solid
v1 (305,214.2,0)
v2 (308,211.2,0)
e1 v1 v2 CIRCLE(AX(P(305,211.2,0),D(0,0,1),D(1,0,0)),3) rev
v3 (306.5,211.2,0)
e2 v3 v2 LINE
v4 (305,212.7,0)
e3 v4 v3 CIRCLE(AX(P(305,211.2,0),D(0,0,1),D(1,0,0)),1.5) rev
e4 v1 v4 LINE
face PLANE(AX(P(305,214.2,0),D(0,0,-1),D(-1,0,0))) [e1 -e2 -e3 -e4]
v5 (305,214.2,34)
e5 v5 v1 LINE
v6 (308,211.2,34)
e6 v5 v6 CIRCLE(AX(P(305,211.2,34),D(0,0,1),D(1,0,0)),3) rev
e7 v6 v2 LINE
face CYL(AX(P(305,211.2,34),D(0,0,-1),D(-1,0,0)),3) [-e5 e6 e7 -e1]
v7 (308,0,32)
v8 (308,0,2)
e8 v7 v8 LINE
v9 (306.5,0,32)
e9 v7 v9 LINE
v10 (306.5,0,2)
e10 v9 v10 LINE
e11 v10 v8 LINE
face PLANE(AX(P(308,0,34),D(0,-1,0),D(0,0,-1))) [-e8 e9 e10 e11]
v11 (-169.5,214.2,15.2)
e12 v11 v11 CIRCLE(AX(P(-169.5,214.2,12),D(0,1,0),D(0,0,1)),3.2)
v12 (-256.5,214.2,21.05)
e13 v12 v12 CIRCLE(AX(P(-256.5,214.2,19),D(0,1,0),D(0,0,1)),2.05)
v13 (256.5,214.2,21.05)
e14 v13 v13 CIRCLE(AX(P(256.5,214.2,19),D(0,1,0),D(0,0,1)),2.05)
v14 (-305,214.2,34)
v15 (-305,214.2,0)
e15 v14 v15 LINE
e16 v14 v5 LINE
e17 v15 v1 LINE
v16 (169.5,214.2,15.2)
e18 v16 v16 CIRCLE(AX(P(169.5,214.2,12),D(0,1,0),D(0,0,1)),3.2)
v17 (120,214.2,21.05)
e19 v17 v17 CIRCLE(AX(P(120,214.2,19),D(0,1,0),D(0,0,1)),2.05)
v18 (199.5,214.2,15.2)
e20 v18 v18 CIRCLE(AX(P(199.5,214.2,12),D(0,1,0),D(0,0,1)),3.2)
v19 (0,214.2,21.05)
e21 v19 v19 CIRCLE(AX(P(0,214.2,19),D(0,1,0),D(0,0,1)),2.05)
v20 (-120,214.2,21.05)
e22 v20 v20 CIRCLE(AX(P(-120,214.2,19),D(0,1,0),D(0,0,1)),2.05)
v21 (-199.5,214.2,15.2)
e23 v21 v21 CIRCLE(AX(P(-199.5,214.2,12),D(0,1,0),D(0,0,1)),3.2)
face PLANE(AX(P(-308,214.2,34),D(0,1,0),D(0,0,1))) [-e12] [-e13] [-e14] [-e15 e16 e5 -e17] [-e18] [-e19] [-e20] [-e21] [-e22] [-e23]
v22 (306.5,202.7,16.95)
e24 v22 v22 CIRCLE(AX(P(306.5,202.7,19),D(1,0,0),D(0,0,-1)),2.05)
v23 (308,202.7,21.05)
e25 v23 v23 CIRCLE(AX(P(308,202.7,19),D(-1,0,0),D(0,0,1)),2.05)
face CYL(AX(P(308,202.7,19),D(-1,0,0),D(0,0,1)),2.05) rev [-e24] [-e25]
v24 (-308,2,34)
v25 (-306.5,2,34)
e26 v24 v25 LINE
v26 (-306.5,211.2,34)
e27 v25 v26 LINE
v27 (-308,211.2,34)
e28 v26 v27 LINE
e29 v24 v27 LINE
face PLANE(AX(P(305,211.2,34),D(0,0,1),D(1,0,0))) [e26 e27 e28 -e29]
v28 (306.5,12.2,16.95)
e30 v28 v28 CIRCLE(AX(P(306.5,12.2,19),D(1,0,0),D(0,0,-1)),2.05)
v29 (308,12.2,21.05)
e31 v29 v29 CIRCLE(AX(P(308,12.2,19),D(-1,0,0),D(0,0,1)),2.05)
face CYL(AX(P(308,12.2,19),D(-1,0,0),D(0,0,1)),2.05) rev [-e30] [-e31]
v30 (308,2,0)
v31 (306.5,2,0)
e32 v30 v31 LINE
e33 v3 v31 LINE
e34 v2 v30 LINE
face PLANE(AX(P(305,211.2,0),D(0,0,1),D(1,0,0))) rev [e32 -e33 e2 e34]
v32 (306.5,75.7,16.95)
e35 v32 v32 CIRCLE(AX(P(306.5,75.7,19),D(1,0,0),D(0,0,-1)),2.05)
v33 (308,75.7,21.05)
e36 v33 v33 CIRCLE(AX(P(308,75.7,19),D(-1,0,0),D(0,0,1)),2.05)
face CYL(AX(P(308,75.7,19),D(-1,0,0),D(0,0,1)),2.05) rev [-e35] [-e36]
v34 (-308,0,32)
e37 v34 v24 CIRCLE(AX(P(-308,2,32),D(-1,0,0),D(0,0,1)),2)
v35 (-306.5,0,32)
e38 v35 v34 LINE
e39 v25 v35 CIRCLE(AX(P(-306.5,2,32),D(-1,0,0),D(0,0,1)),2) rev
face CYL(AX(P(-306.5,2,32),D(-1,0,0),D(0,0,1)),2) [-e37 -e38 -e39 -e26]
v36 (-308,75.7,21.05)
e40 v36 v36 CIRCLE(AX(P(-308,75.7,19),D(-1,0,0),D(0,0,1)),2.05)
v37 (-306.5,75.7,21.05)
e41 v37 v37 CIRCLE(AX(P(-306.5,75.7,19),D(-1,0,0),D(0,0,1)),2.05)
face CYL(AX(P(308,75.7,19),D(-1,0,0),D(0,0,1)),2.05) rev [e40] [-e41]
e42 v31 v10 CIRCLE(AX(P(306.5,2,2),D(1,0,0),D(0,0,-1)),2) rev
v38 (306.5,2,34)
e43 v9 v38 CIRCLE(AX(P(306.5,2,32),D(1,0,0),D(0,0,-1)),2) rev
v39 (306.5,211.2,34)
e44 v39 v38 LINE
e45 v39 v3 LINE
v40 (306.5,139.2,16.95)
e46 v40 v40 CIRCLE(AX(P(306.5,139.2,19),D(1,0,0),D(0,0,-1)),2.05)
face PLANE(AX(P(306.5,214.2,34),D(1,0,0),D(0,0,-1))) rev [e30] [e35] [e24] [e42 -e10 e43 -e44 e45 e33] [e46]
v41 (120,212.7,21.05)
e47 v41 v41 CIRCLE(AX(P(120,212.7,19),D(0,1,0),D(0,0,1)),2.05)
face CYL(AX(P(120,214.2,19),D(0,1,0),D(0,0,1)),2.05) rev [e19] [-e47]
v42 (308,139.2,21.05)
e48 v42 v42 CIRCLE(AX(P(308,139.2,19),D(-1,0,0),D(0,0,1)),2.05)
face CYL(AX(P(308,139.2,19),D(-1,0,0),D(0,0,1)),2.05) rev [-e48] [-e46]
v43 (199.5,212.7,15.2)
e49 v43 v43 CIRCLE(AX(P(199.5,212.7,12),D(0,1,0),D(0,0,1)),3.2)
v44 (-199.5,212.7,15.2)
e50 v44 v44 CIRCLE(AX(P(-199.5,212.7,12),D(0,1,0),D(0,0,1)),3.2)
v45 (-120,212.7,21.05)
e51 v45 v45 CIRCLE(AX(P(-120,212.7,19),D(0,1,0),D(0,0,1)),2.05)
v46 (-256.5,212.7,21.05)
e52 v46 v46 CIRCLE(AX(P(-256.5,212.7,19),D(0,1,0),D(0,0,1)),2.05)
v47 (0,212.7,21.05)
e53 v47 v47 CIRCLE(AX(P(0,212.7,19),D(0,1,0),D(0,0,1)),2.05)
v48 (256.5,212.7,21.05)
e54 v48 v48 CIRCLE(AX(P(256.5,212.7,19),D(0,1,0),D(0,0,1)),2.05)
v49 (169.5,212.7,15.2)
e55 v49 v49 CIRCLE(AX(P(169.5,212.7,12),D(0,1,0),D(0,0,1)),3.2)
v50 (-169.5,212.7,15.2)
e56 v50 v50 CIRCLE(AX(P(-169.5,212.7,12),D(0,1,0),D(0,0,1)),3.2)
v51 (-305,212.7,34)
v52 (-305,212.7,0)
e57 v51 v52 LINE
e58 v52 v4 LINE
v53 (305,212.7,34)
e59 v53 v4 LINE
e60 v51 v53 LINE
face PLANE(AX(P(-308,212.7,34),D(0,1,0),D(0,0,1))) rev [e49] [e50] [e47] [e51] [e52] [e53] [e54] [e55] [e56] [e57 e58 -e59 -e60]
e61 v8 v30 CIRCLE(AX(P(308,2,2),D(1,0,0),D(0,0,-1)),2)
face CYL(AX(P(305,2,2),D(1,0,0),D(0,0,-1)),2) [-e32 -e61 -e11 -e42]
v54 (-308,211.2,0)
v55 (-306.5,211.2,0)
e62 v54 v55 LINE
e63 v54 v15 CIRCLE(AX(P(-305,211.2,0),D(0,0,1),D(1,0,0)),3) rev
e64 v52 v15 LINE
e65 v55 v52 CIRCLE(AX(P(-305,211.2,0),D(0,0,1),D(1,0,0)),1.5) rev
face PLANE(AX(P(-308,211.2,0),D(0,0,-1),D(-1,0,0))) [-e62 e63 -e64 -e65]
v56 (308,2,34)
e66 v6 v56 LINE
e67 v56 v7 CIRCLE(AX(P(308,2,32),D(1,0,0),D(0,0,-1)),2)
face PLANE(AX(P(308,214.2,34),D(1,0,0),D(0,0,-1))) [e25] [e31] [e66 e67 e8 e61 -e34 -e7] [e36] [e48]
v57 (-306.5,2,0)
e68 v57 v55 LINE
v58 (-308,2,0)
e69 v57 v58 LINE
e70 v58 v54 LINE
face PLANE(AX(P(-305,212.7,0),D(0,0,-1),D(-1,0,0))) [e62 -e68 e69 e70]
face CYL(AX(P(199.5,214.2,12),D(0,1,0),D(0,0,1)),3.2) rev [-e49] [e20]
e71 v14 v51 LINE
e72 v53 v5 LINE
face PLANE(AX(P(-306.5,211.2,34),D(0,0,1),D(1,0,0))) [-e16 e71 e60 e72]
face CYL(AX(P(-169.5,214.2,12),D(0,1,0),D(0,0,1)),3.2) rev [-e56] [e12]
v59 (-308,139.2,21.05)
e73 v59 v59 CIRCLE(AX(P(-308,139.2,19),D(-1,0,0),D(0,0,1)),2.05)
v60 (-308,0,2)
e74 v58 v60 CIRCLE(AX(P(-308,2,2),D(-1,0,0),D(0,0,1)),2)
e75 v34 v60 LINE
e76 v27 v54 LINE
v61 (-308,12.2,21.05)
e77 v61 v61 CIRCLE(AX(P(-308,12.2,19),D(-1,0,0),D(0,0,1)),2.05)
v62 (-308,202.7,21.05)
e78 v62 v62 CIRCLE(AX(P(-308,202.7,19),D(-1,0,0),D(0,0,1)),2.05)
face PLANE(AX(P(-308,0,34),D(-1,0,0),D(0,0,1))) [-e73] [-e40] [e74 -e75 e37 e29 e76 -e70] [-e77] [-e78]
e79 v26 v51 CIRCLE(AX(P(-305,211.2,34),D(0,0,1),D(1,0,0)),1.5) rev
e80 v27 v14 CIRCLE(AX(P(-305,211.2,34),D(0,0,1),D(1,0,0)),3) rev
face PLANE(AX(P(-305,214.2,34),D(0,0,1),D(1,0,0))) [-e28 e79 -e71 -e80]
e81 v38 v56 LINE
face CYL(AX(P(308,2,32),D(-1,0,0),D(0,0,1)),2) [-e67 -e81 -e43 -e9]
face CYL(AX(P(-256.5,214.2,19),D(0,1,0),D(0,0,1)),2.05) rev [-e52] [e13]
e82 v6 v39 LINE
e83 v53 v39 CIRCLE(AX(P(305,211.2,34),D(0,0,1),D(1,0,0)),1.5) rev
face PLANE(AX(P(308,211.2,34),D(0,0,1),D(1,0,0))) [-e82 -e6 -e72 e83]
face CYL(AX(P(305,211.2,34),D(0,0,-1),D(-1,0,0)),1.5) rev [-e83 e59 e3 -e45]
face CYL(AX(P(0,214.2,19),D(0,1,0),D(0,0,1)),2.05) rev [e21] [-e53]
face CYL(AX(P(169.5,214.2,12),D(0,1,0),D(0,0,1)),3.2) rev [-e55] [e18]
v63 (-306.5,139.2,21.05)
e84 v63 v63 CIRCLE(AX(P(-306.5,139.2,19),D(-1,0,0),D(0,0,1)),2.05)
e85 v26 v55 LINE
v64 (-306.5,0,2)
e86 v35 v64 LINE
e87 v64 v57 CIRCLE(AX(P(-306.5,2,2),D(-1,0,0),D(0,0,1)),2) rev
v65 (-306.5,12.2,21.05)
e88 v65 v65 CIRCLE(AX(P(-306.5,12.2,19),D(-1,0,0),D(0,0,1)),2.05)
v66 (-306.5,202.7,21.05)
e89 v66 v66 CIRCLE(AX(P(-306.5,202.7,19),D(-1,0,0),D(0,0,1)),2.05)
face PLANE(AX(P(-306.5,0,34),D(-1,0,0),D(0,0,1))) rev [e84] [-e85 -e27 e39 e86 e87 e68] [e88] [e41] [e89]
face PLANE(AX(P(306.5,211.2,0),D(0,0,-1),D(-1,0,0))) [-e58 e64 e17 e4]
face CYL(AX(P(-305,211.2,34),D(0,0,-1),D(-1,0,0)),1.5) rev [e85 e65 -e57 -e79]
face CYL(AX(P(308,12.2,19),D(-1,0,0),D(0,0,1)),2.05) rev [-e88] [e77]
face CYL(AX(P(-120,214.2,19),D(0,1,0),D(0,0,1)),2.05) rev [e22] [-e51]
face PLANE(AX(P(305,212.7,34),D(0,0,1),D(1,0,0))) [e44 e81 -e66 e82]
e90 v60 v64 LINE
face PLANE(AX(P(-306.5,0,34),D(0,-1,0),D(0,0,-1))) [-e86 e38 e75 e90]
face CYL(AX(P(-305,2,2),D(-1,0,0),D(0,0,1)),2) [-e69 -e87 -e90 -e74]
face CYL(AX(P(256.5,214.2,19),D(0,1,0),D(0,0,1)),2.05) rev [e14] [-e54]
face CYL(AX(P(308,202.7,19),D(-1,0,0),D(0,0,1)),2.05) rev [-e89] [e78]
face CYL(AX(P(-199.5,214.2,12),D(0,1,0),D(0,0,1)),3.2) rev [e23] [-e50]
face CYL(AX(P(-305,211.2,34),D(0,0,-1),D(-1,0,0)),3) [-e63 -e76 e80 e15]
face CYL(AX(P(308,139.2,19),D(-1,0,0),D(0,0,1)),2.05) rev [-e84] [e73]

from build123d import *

# Parameters (mm, degrees)
BASE_FLANGE1_DEPTH         = 34
SKETCH2_R                  = 2.05
CUT_EXTRUDE1_DEPTH         = 654.06480536
M6_CLEARANCE_HOLE1_D       = 6.4
FILLET1_R                  = 2
F_4_1_4_1_DIAMETER_HOLE1_D = 4.1


# Sheet-metal steps are written as plain solids
with BuildPart() as part:
    # Sketch1 → Base-Flange1 (new body)
    with BuildSketch(Plane.XY):
        with BuildLine():
            Line((-308, 0), (-308, 211.2))
            ThreePointArc((-308, 211.2), (-307.121320344, 213.321320344), (-305, 214.2))
            Line((-305, 214.2), (305, 214.2))
            ThreePointArc((305, 214.2), (307.121320344, 213.321320344), (308, 211.2))
            Line((308, 211.2), (308, 0))
            Line((308, 0), (306.5, 0))
            Line((306.5, 0), (306.5, 211.2))
            ThreePointArc((306.5, 211.2), (306.060660172, 212.260660172), (305, 212.7))
            Line((305, 212.7), (-305, 212.7))
            ThreePointArc((-305, 212.7), (-306.060660172, 212.260660172), (-306.5, 211.2))
            Line((-306.5, 211.2), (-306.5, 0))
            Line((-306.5, 0), (-308, 0))
        make_face()
    extrude(amount=BASE_FLANGE1_DEPTH)

    # Sketch2 → Cut-Extrude1 (cut, through all)
    with BuildSketch(Plane.ZY.offset(308)):
        with Locations((19, 12.2)):
            Circle(SKETCH2_R)
        with Locations((19, 75.7)):
            Circle(SKETCH2_R)
        with Locations((19, 139.2)):
            Circle(SKETCH2_R)
        with Locations((19, 202.7)):
            Circle(SKETCH2_R)
    extrude(amount=-CUT_EXTRUDE1_DEPTH, mode=Mode.SUBTRACT)

    # M6 Clearance Hole1 (through all)
    with Locations(Plane(origin=(0, 214.2, 0), x_dir=(1, 0, 0), z_dir=(0, 1, 0))):
        with Locations((-199.5, -12), (-169.5, -12)):
            m6_clearance_hole1 = Hole(M6_CLEARANCE_HOLE1_D / 2)

    # Fillet1
    fillet1_edges = [part.edges().sort_by_distance(p)[0] for p in [
        (-307.25, 0, 0),
        (307.25, 0, 0),
        (-307.25, 0, 34),
        (307.25, 0, 34),
    ]]
    fillet(fillet1_edges, radius=FILLET1_R)

    # Ø4.1 (4.1) Diameter Hole1 (through all)
    with Locations(Plane(origin=(0, 214.2, 0), x_dir=(1, 0, 0), z_dir=(0, 1, 0))):
        with Locations((-256.5, -19), (-120, -19), (0, -19), (120, -19), (256.5, -19)):
            Hole(F_4_1_4_1_DIAMETER_HOLE1_D / 2)

    # Mirror1: M6 Clearance Hole1 across Right Plane
    add(m6_clearance_hole1.mirror(Plane(origin=(0, 0, 0), x_dir=(0, 0, -1), z_dir=(1, 0, 0))), mode=Mode.SUBTRACT)


solid = part.part
